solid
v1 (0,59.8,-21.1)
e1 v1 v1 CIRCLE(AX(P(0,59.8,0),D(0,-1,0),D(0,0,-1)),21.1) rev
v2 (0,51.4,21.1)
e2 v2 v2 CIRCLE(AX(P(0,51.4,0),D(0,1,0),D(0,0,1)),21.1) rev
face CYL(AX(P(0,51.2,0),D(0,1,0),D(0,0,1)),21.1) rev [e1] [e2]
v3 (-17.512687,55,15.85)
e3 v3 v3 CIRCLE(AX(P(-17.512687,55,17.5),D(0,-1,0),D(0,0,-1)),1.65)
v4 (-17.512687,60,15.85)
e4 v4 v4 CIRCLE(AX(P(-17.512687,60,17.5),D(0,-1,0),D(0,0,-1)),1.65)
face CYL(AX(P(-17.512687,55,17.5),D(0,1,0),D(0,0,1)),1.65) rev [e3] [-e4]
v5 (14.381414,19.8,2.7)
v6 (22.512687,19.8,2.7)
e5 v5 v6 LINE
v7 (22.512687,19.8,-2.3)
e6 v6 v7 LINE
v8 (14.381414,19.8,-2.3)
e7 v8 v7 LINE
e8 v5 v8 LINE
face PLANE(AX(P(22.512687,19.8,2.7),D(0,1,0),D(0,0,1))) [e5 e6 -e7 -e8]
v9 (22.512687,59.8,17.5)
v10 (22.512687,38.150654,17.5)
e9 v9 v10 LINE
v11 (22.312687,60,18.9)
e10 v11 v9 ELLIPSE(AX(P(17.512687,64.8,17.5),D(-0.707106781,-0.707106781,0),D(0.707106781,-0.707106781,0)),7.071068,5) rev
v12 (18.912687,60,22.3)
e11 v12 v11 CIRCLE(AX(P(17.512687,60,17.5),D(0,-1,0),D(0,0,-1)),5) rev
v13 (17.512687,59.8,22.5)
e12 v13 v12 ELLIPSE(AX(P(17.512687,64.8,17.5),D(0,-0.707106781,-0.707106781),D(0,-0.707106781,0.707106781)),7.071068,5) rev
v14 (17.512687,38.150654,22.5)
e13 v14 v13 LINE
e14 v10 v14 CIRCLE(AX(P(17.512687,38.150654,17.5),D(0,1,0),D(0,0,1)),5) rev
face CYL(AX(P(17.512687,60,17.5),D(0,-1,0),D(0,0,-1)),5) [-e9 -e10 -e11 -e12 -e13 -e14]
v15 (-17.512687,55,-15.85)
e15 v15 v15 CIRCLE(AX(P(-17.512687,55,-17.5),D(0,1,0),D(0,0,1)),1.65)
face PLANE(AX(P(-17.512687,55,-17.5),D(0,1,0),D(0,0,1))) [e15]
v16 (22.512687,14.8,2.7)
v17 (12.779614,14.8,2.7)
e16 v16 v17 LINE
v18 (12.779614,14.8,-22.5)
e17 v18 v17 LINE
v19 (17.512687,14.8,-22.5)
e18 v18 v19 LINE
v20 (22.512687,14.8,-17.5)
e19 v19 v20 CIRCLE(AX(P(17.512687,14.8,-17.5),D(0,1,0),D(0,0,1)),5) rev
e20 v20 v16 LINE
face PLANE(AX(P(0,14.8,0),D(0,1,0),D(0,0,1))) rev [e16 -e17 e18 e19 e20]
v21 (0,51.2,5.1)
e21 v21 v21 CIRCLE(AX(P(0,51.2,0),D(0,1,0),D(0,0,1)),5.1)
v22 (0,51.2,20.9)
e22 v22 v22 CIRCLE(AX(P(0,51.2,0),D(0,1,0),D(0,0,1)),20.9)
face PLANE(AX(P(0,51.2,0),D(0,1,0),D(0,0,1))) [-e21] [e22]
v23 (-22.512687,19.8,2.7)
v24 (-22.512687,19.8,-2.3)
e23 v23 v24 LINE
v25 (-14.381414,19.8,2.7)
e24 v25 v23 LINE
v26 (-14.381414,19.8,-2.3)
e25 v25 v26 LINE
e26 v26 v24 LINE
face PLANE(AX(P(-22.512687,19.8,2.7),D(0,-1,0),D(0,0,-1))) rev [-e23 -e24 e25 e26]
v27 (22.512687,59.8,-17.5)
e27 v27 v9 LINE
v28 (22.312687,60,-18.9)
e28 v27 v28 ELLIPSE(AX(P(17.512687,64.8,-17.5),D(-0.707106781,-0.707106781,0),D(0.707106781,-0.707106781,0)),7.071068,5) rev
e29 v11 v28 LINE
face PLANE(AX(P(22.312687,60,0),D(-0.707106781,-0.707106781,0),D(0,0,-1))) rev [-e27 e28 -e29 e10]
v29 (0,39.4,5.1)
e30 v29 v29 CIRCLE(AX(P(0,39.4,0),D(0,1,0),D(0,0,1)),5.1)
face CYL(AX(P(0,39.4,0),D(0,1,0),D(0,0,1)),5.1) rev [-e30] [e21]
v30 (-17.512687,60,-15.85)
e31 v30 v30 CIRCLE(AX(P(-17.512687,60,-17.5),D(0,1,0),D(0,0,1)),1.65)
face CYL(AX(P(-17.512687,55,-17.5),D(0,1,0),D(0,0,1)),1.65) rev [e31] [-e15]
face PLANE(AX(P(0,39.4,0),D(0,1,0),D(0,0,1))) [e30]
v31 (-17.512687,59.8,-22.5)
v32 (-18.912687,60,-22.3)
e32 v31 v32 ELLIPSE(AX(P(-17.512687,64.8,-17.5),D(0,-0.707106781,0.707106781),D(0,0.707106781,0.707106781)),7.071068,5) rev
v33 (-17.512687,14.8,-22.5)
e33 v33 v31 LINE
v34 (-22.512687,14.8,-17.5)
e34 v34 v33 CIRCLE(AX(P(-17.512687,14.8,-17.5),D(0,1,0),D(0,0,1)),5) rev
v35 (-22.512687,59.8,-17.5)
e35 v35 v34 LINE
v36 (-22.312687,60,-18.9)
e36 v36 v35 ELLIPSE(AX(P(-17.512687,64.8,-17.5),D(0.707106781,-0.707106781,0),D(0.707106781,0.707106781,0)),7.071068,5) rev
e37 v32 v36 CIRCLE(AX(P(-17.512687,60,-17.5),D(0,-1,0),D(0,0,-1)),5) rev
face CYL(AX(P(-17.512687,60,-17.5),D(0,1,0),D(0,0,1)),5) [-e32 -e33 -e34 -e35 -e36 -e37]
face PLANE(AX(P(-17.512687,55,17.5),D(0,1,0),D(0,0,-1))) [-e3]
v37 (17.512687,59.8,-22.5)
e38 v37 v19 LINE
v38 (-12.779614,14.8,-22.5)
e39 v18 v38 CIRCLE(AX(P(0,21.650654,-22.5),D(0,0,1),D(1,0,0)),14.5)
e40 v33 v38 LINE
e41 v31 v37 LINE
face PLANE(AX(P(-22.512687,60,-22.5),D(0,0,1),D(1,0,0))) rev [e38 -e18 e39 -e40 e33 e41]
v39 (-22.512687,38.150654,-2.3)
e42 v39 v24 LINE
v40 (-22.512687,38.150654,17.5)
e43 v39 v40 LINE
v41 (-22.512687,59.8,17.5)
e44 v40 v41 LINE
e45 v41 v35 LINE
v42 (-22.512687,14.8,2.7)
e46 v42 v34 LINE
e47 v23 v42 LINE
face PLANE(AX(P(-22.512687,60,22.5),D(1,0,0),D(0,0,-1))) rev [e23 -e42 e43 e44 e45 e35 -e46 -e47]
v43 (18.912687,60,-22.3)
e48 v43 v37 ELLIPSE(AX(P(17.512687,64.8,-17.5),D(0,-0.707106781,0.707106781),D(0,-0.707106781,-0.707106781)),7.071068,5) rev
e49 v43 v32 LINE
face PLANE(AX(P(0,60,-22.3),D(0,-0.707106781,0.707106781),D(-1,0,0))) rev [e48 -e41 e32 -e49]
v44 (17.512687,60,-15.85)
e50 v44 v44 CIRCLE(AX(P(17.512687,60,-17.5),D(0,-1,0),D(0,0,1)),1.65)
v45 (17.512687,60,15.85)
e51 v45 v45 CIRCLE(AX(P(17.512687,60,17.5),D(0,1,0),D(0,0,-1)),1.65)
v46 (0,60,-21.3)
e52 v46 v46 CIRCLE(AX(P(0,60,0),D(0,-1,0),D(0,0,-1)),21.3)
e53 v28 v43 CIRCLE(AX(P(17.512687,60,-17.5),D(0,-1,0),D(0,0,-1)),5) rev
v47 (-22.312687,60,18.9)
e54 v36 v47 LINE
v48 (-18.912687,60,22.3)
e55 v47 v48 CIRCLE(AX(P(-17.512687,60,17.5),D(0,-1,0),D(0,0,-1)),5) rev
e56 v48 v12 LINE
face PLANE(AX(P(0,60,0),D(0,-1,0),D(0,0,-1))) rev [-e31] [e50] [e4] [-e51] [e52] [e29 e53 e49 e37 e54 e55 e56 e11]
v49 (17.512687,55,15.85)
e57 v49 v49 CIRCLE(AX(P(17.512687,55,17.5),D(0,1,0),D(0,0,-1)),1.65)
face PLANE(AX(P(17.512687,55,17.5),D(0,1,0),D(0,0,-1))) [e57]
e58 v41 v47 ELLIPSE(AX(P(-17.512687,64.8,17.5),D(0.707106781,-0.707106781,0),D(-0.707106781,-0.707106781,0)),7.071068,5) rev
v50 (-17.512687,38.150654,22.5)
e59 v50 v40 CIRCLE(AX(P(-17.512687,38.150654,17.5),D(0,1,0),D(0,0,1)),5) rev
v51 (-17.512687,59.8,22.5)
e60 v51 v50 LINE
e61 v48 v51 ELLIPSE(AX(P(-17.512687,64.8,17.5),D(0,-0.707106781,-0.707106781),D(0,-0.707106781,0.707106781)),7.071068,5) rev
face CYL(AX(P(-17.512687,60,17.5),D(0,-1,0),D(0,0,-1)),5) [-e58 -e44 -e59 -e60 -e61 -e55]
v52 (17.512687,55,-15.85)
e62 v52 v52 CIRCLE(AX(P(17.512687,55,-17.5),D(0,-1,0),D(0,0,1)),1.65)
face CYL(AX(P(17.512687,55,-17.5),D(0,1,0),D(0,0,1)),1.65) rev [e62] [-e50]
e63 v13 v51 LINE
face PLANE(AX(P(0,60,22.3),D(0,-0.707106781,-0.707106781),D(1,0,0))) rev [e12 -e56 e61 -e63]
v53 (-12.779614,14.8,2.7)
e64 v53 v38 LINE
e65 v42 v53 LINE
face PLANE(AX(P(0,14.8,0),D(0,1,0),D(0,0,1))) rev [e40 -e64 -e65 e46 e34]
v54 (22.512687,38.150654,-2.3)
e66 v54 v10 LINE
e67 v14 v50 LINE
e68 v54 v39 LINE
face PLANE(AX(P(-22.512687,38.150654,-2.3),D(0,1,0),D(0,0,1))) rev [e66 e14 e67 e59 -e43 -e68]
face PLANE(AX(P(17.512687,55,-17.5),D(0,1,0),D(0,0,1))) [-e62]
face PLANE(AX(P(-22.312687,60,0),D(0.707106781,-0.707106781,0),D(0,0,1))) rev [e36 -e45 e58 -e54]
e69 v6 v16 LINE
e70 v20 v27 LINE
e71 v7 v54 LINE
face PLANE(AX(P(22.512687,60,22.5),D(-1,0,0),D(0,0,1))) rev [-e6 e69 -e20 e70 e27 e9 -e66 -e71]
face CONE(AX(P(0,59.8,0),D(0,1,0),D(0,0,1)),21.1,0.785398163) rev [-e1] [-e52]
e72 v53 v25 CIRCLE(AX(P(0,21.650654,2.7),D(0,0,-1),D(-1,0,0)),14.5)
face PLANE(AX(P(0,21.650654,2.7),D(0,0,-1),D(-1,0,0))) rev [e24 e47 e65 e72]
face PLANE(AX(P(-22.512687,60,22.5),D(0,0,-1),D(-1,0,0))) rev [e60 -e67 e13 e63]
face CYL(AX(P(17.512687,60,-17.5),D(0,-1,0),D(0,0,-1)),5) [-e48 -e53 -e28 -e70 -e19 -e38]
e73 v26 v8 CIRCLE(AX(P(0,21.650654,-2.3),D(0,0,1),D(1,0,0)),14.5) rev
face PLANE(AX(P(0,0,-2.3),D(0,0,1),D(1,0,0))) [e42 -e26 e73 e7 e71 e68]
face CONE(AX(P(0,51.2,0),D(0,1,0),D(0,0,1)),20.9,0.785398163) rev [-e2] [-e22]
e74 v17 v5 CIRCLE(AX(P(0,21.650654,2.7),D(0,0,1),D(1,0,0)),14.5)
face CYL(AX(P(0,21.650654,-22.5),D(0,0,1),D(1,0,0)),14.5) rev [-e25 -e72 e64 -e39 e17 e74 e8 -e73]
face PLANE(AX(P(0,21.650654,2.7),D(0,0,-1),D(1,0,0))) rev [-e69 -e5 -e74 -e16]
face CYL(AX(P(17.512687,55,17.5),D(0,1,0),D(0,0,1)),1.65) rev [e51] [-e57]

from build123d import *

# Parameters (mm, degrees)
SKETCH1_W                                  = 45.025374044
SKETCH1_H                                  = 45
BOSS_EXTRUDE1_DEPTH                        = 60
SKETCH2_R                                  = 21.1
CUT_EXTRUDE1_DEPTH                         = 8.8
SKETCH3_R                                  = 5.1
CUT_EXTRUDE2_DEPTH                         = 11.8
CHAMFER1_SIZE                              = 0.2
SKETCH4_R                                  = 14.5
CUT_EXTRUDE3_DEPTH                         = 79.305945349
SKETCH5_W                                  = 45.025374044
SKETCH5_H                                  = 45
CUT_EXTRUDE4_DEPTH                         = 14.8
SKETCH6_W                                  = 45.025374044
SKETCH6_H                                  = 23.350654293
CUT_EXTRUDE5_DEPTH                         = 24.8
FILLET3_R                                  = 5
FILLET4_R                                  = 5
FILLET7_R                                  = 5
FILLET8_R                                  = 5
BOSS_EXTRUDE3_START                        = 5
BOSS_EXTRUDE3_DEPTH                        = 5
SKETCH9_R                                  = 1.65
CUT_EXTRUDE6_DEPTH                         = 5
MIRROR2_AT_THE_SECOND_PLANE_COPY_1_SKETC_R = 1.65
MIRROR2_AT_THE_SECOND_PLANE_COPY_1_DEPTH   = 5


with BuildPart() as part:
    # Sketch1 → Boss-Extrude1 (new body)
    with BuildSketch(Plane(origin=(0, 0, 0), x_dir=(1, 0, 0), z_dir=(0, 1, 0))):
        Rectangle(SKETCH1_W, SKETCH1_H)
    extrude(amount=BOSS_EXTRUDE1_DEPTH)

    # Sketch2 → Cut-Extrude1 (cut)
    with BuildSketch(Plane(origin=(0, 60, 0), x_dir=(1, 0, 0), z_dir=(0, 1, 0))):
        with Locations(Location((0, 0, 0), (0, 0, 270))):
            Circle(SKETCH2_R)
    extrude(amount=-CUT_EXTRUDE1_DEPTH, mode=Mode.SUBTRACT)

    # Sketch3 → Cut-Extrude2 (cut)
    with BuildSketch(Plane(origin=(0, 51.2, 0), x_dir=(1, 0, 0), z_dir=(0, 1, 0))):
        with Locations(Location((0, 0, 0), (0, 0, 270))):
            Circle(SKETCH3_R)
    extrude(amount=-CUT_EXTRUDE2_DEPTH, mode=Mode.SUBTRACT)

    # Chamfer1
    chamfer1_edges = [part.edges().sort_by_distance(p)[0] for p in [
        (-22.512687022, 60, 0),
        (0, 51.2, -21.1),
        (0, 60, -21.1),
        (0, 60, 22.5),
        (22.512687022, 60, 0),
        (0, 60, -22.5),
    ]]
    chamfer(chamfer1_edges, length=CHAMFER1_SIZE)

    # Sketch4 → Cut-Extrude3 (cut, through all)
    with BuildSketch(Plane.XY.offset(22.5)):
        with Locations((0, 21.650654293)):
            Circle(SKETCH4_R)
    extrude(amount=-CUT_EXTRUDE3_DEPTH, mode=Mode.SUBTRACT)

    # Sketch5 → Cut-Extrude4 (cut)
    with BuildSketch(Plane.XZ):
        Rectangle(SKETCH5_W, SKETCH5_H)
    extrude(amount=-CUT_EXTRUDE4_DEPTH, mode=Mode.SUBTRACT)

    # Sketch6 → Cut-Extrude5 (cut)
    with BuildSketch(Plane.XY.offset(22.5)):
        with Locations((0, 26.475327146)):
            Rectangle(SKETCH6_W, SKETCH6_H)
    extrude(amount=-CUT_EXTRUDE5_DEPTH, mode=Mode.SUBTRACT)

    # Fillet3
    # the kernel refuses this fillet: 5 mm, written as the material it takes off along each edge
    with BuildSketch(Plane(origin=(22.512687022, 2.3, -22.5), x_dir=(0, 0, 1), z_dir=(0, 1, 0))) as fillet3_piece_1:
        with BuildLine():
            CenterArc((FILLET3_R, -FILLET3_R), FILLET3_R, 90, 90)
            Line((0, -FILLET3_R), (0, 0))
            Line((0, 0), (FILLET3_R, 0))
        make_face()
    extrude(amount=70, mode=Mode.SUBTRACT)

    # Fillet4
    # the kernel refuses this fillet: 5 mm, written as the material it takes off along each edge
    with BuildSketch(Plane(origin=(-22.512687022, 2.3, -22.5), x_dir=(0, 0, 1), z_dir=(0, 1, 0))) as fillet4_piece_1:
        with BuildLine():
            CenterArc((FILLET4_R, FILLET4_R), FILLET4_R, 180, 90)
            Line((0, FILLET4_R), (0, 0))
            Line((0, 0), (FILLET4_R, 0))
        make_face()
    extrude(amount=70, mode=Mode.SUBTRACT)

    # Fillet7
    # the kernel refuses this fillet: 5 mm, written as the material it takes off along each edge
    with BuildSketch(Plane(origin=(22.512687022, 25.650654293, 22.5), x_dir=(-1, 0, 0), z_dir=(0, 1, 0))) as fillet7_piece_1:
        with BuildLine():
            CenterArc((FILLET7_R, -FILLET7_R), FILLET7_R, 90, 90)
            Line((0, -FILLET7_R), (0, 0))
            Line((0, 0), (FILLET7_R, 0))
        make_face()
    extrude(amount=46.649345707, mode=Mode.SUBTRACT)

    # Fillet8
    # the kernel refuses this fillet: 5 mm, written as the material it takes off along each edge
    with BuildSketch(Plane(origin=(-22.512687022, 25.650654293, 22.5), x_dir=(1, 0, 0), z_dir=(0, 1, 0))) as fillet8_piece_1:
        with BuildLine():
            CenterArc((FILLET8_R, FILLET8_R), FILLET8_R, 180, 90)
            Line((0, FILLET8_R), (0, 0))
            Line((0, 0), (FILLET8_R, 0))
        make_face()
    extrude(amount=46.649345707, mode=Mode.SUBTRACT)

    # Sketch7 → Boss-Extrude3 (add)
    with BuildSketch(Plane.XY.offset(-2.3).offset(BOSS_EXTRUDE3_START)):
        with BuildLine():
            Line((-22.512687022, 14.8), (-12.779614069, 14.8))
            ThreePointArc((-12.779614069, 14.8), (-13.808706174, 17.22689641), (-14.381414349, 19.8))
            Line((-14.381414349, 19.8), (-22.512687022, 19.8))
            Line((-22.512687022, 19.8), (-22.512687022, 14.8))
        make_face()
    boss_extrude3 = extrude(amount=-BOSS_EXTRUDE3_DEPTH)

    # Mirror1: Boss-Extrude3 across plane
    add(boss_extrude3.mirror(Plane(origin=(0, 0, 0), x_dir=(0, 0, 1), z_dir=(1, 0, 0))))

    # Sketch9 → Cut-Extrude6 (cut)
    with BuildSketch(Plane(origin=(0, 60, 0), x_dir=(1, 0, 0), z_dir=(0, 1, 0))):
        with Locations(Location((-17.512687022, 17.5, 0), (0, 0, 270))):
            Circle(SKETCH9_R)
    cut_extrude6 = extrude(amount=-CUT_EXTRUDE6_DEPTH, mode=Mode.SUBTRACT)

    # Mirror2: Cut-Extrude6 across plane
    add(cut_extrude6.mirror(Plane(origin=(0, 0, 0), x_dir=(0, 0, 1), z_dir=(1, 0, 0))), mode=Mode.SUBTRACT)

    # Mirror2 at the second plane: Cut-Extrude6 across plane
    add(cut_extrude6.mirror(Plane.XY), mode=Mode.SUBTRACT)

    # Mirror2 at the second plane copy 1 sketc → Mirror2 at the second plane copy 1 (cut)
    with BuildSketch(Plane(origin=(0, 60, 0), x_dir=(-1, 0, 0), z_dir=(0, 1, 0))):
        with Locations(Location((-17.512687022, 17.5, 0), (0, 0, 270))):
            Circle(MIRROR2_AT_THE_SECOND_PLANE_COPY_1_SKETC_R)
    extrude(amount=-MIRROR2_AT_THE_SECOND_PLANE_COPY_1_DEPTH, mode=Mode.SUBTRACT)


solid = part.part
